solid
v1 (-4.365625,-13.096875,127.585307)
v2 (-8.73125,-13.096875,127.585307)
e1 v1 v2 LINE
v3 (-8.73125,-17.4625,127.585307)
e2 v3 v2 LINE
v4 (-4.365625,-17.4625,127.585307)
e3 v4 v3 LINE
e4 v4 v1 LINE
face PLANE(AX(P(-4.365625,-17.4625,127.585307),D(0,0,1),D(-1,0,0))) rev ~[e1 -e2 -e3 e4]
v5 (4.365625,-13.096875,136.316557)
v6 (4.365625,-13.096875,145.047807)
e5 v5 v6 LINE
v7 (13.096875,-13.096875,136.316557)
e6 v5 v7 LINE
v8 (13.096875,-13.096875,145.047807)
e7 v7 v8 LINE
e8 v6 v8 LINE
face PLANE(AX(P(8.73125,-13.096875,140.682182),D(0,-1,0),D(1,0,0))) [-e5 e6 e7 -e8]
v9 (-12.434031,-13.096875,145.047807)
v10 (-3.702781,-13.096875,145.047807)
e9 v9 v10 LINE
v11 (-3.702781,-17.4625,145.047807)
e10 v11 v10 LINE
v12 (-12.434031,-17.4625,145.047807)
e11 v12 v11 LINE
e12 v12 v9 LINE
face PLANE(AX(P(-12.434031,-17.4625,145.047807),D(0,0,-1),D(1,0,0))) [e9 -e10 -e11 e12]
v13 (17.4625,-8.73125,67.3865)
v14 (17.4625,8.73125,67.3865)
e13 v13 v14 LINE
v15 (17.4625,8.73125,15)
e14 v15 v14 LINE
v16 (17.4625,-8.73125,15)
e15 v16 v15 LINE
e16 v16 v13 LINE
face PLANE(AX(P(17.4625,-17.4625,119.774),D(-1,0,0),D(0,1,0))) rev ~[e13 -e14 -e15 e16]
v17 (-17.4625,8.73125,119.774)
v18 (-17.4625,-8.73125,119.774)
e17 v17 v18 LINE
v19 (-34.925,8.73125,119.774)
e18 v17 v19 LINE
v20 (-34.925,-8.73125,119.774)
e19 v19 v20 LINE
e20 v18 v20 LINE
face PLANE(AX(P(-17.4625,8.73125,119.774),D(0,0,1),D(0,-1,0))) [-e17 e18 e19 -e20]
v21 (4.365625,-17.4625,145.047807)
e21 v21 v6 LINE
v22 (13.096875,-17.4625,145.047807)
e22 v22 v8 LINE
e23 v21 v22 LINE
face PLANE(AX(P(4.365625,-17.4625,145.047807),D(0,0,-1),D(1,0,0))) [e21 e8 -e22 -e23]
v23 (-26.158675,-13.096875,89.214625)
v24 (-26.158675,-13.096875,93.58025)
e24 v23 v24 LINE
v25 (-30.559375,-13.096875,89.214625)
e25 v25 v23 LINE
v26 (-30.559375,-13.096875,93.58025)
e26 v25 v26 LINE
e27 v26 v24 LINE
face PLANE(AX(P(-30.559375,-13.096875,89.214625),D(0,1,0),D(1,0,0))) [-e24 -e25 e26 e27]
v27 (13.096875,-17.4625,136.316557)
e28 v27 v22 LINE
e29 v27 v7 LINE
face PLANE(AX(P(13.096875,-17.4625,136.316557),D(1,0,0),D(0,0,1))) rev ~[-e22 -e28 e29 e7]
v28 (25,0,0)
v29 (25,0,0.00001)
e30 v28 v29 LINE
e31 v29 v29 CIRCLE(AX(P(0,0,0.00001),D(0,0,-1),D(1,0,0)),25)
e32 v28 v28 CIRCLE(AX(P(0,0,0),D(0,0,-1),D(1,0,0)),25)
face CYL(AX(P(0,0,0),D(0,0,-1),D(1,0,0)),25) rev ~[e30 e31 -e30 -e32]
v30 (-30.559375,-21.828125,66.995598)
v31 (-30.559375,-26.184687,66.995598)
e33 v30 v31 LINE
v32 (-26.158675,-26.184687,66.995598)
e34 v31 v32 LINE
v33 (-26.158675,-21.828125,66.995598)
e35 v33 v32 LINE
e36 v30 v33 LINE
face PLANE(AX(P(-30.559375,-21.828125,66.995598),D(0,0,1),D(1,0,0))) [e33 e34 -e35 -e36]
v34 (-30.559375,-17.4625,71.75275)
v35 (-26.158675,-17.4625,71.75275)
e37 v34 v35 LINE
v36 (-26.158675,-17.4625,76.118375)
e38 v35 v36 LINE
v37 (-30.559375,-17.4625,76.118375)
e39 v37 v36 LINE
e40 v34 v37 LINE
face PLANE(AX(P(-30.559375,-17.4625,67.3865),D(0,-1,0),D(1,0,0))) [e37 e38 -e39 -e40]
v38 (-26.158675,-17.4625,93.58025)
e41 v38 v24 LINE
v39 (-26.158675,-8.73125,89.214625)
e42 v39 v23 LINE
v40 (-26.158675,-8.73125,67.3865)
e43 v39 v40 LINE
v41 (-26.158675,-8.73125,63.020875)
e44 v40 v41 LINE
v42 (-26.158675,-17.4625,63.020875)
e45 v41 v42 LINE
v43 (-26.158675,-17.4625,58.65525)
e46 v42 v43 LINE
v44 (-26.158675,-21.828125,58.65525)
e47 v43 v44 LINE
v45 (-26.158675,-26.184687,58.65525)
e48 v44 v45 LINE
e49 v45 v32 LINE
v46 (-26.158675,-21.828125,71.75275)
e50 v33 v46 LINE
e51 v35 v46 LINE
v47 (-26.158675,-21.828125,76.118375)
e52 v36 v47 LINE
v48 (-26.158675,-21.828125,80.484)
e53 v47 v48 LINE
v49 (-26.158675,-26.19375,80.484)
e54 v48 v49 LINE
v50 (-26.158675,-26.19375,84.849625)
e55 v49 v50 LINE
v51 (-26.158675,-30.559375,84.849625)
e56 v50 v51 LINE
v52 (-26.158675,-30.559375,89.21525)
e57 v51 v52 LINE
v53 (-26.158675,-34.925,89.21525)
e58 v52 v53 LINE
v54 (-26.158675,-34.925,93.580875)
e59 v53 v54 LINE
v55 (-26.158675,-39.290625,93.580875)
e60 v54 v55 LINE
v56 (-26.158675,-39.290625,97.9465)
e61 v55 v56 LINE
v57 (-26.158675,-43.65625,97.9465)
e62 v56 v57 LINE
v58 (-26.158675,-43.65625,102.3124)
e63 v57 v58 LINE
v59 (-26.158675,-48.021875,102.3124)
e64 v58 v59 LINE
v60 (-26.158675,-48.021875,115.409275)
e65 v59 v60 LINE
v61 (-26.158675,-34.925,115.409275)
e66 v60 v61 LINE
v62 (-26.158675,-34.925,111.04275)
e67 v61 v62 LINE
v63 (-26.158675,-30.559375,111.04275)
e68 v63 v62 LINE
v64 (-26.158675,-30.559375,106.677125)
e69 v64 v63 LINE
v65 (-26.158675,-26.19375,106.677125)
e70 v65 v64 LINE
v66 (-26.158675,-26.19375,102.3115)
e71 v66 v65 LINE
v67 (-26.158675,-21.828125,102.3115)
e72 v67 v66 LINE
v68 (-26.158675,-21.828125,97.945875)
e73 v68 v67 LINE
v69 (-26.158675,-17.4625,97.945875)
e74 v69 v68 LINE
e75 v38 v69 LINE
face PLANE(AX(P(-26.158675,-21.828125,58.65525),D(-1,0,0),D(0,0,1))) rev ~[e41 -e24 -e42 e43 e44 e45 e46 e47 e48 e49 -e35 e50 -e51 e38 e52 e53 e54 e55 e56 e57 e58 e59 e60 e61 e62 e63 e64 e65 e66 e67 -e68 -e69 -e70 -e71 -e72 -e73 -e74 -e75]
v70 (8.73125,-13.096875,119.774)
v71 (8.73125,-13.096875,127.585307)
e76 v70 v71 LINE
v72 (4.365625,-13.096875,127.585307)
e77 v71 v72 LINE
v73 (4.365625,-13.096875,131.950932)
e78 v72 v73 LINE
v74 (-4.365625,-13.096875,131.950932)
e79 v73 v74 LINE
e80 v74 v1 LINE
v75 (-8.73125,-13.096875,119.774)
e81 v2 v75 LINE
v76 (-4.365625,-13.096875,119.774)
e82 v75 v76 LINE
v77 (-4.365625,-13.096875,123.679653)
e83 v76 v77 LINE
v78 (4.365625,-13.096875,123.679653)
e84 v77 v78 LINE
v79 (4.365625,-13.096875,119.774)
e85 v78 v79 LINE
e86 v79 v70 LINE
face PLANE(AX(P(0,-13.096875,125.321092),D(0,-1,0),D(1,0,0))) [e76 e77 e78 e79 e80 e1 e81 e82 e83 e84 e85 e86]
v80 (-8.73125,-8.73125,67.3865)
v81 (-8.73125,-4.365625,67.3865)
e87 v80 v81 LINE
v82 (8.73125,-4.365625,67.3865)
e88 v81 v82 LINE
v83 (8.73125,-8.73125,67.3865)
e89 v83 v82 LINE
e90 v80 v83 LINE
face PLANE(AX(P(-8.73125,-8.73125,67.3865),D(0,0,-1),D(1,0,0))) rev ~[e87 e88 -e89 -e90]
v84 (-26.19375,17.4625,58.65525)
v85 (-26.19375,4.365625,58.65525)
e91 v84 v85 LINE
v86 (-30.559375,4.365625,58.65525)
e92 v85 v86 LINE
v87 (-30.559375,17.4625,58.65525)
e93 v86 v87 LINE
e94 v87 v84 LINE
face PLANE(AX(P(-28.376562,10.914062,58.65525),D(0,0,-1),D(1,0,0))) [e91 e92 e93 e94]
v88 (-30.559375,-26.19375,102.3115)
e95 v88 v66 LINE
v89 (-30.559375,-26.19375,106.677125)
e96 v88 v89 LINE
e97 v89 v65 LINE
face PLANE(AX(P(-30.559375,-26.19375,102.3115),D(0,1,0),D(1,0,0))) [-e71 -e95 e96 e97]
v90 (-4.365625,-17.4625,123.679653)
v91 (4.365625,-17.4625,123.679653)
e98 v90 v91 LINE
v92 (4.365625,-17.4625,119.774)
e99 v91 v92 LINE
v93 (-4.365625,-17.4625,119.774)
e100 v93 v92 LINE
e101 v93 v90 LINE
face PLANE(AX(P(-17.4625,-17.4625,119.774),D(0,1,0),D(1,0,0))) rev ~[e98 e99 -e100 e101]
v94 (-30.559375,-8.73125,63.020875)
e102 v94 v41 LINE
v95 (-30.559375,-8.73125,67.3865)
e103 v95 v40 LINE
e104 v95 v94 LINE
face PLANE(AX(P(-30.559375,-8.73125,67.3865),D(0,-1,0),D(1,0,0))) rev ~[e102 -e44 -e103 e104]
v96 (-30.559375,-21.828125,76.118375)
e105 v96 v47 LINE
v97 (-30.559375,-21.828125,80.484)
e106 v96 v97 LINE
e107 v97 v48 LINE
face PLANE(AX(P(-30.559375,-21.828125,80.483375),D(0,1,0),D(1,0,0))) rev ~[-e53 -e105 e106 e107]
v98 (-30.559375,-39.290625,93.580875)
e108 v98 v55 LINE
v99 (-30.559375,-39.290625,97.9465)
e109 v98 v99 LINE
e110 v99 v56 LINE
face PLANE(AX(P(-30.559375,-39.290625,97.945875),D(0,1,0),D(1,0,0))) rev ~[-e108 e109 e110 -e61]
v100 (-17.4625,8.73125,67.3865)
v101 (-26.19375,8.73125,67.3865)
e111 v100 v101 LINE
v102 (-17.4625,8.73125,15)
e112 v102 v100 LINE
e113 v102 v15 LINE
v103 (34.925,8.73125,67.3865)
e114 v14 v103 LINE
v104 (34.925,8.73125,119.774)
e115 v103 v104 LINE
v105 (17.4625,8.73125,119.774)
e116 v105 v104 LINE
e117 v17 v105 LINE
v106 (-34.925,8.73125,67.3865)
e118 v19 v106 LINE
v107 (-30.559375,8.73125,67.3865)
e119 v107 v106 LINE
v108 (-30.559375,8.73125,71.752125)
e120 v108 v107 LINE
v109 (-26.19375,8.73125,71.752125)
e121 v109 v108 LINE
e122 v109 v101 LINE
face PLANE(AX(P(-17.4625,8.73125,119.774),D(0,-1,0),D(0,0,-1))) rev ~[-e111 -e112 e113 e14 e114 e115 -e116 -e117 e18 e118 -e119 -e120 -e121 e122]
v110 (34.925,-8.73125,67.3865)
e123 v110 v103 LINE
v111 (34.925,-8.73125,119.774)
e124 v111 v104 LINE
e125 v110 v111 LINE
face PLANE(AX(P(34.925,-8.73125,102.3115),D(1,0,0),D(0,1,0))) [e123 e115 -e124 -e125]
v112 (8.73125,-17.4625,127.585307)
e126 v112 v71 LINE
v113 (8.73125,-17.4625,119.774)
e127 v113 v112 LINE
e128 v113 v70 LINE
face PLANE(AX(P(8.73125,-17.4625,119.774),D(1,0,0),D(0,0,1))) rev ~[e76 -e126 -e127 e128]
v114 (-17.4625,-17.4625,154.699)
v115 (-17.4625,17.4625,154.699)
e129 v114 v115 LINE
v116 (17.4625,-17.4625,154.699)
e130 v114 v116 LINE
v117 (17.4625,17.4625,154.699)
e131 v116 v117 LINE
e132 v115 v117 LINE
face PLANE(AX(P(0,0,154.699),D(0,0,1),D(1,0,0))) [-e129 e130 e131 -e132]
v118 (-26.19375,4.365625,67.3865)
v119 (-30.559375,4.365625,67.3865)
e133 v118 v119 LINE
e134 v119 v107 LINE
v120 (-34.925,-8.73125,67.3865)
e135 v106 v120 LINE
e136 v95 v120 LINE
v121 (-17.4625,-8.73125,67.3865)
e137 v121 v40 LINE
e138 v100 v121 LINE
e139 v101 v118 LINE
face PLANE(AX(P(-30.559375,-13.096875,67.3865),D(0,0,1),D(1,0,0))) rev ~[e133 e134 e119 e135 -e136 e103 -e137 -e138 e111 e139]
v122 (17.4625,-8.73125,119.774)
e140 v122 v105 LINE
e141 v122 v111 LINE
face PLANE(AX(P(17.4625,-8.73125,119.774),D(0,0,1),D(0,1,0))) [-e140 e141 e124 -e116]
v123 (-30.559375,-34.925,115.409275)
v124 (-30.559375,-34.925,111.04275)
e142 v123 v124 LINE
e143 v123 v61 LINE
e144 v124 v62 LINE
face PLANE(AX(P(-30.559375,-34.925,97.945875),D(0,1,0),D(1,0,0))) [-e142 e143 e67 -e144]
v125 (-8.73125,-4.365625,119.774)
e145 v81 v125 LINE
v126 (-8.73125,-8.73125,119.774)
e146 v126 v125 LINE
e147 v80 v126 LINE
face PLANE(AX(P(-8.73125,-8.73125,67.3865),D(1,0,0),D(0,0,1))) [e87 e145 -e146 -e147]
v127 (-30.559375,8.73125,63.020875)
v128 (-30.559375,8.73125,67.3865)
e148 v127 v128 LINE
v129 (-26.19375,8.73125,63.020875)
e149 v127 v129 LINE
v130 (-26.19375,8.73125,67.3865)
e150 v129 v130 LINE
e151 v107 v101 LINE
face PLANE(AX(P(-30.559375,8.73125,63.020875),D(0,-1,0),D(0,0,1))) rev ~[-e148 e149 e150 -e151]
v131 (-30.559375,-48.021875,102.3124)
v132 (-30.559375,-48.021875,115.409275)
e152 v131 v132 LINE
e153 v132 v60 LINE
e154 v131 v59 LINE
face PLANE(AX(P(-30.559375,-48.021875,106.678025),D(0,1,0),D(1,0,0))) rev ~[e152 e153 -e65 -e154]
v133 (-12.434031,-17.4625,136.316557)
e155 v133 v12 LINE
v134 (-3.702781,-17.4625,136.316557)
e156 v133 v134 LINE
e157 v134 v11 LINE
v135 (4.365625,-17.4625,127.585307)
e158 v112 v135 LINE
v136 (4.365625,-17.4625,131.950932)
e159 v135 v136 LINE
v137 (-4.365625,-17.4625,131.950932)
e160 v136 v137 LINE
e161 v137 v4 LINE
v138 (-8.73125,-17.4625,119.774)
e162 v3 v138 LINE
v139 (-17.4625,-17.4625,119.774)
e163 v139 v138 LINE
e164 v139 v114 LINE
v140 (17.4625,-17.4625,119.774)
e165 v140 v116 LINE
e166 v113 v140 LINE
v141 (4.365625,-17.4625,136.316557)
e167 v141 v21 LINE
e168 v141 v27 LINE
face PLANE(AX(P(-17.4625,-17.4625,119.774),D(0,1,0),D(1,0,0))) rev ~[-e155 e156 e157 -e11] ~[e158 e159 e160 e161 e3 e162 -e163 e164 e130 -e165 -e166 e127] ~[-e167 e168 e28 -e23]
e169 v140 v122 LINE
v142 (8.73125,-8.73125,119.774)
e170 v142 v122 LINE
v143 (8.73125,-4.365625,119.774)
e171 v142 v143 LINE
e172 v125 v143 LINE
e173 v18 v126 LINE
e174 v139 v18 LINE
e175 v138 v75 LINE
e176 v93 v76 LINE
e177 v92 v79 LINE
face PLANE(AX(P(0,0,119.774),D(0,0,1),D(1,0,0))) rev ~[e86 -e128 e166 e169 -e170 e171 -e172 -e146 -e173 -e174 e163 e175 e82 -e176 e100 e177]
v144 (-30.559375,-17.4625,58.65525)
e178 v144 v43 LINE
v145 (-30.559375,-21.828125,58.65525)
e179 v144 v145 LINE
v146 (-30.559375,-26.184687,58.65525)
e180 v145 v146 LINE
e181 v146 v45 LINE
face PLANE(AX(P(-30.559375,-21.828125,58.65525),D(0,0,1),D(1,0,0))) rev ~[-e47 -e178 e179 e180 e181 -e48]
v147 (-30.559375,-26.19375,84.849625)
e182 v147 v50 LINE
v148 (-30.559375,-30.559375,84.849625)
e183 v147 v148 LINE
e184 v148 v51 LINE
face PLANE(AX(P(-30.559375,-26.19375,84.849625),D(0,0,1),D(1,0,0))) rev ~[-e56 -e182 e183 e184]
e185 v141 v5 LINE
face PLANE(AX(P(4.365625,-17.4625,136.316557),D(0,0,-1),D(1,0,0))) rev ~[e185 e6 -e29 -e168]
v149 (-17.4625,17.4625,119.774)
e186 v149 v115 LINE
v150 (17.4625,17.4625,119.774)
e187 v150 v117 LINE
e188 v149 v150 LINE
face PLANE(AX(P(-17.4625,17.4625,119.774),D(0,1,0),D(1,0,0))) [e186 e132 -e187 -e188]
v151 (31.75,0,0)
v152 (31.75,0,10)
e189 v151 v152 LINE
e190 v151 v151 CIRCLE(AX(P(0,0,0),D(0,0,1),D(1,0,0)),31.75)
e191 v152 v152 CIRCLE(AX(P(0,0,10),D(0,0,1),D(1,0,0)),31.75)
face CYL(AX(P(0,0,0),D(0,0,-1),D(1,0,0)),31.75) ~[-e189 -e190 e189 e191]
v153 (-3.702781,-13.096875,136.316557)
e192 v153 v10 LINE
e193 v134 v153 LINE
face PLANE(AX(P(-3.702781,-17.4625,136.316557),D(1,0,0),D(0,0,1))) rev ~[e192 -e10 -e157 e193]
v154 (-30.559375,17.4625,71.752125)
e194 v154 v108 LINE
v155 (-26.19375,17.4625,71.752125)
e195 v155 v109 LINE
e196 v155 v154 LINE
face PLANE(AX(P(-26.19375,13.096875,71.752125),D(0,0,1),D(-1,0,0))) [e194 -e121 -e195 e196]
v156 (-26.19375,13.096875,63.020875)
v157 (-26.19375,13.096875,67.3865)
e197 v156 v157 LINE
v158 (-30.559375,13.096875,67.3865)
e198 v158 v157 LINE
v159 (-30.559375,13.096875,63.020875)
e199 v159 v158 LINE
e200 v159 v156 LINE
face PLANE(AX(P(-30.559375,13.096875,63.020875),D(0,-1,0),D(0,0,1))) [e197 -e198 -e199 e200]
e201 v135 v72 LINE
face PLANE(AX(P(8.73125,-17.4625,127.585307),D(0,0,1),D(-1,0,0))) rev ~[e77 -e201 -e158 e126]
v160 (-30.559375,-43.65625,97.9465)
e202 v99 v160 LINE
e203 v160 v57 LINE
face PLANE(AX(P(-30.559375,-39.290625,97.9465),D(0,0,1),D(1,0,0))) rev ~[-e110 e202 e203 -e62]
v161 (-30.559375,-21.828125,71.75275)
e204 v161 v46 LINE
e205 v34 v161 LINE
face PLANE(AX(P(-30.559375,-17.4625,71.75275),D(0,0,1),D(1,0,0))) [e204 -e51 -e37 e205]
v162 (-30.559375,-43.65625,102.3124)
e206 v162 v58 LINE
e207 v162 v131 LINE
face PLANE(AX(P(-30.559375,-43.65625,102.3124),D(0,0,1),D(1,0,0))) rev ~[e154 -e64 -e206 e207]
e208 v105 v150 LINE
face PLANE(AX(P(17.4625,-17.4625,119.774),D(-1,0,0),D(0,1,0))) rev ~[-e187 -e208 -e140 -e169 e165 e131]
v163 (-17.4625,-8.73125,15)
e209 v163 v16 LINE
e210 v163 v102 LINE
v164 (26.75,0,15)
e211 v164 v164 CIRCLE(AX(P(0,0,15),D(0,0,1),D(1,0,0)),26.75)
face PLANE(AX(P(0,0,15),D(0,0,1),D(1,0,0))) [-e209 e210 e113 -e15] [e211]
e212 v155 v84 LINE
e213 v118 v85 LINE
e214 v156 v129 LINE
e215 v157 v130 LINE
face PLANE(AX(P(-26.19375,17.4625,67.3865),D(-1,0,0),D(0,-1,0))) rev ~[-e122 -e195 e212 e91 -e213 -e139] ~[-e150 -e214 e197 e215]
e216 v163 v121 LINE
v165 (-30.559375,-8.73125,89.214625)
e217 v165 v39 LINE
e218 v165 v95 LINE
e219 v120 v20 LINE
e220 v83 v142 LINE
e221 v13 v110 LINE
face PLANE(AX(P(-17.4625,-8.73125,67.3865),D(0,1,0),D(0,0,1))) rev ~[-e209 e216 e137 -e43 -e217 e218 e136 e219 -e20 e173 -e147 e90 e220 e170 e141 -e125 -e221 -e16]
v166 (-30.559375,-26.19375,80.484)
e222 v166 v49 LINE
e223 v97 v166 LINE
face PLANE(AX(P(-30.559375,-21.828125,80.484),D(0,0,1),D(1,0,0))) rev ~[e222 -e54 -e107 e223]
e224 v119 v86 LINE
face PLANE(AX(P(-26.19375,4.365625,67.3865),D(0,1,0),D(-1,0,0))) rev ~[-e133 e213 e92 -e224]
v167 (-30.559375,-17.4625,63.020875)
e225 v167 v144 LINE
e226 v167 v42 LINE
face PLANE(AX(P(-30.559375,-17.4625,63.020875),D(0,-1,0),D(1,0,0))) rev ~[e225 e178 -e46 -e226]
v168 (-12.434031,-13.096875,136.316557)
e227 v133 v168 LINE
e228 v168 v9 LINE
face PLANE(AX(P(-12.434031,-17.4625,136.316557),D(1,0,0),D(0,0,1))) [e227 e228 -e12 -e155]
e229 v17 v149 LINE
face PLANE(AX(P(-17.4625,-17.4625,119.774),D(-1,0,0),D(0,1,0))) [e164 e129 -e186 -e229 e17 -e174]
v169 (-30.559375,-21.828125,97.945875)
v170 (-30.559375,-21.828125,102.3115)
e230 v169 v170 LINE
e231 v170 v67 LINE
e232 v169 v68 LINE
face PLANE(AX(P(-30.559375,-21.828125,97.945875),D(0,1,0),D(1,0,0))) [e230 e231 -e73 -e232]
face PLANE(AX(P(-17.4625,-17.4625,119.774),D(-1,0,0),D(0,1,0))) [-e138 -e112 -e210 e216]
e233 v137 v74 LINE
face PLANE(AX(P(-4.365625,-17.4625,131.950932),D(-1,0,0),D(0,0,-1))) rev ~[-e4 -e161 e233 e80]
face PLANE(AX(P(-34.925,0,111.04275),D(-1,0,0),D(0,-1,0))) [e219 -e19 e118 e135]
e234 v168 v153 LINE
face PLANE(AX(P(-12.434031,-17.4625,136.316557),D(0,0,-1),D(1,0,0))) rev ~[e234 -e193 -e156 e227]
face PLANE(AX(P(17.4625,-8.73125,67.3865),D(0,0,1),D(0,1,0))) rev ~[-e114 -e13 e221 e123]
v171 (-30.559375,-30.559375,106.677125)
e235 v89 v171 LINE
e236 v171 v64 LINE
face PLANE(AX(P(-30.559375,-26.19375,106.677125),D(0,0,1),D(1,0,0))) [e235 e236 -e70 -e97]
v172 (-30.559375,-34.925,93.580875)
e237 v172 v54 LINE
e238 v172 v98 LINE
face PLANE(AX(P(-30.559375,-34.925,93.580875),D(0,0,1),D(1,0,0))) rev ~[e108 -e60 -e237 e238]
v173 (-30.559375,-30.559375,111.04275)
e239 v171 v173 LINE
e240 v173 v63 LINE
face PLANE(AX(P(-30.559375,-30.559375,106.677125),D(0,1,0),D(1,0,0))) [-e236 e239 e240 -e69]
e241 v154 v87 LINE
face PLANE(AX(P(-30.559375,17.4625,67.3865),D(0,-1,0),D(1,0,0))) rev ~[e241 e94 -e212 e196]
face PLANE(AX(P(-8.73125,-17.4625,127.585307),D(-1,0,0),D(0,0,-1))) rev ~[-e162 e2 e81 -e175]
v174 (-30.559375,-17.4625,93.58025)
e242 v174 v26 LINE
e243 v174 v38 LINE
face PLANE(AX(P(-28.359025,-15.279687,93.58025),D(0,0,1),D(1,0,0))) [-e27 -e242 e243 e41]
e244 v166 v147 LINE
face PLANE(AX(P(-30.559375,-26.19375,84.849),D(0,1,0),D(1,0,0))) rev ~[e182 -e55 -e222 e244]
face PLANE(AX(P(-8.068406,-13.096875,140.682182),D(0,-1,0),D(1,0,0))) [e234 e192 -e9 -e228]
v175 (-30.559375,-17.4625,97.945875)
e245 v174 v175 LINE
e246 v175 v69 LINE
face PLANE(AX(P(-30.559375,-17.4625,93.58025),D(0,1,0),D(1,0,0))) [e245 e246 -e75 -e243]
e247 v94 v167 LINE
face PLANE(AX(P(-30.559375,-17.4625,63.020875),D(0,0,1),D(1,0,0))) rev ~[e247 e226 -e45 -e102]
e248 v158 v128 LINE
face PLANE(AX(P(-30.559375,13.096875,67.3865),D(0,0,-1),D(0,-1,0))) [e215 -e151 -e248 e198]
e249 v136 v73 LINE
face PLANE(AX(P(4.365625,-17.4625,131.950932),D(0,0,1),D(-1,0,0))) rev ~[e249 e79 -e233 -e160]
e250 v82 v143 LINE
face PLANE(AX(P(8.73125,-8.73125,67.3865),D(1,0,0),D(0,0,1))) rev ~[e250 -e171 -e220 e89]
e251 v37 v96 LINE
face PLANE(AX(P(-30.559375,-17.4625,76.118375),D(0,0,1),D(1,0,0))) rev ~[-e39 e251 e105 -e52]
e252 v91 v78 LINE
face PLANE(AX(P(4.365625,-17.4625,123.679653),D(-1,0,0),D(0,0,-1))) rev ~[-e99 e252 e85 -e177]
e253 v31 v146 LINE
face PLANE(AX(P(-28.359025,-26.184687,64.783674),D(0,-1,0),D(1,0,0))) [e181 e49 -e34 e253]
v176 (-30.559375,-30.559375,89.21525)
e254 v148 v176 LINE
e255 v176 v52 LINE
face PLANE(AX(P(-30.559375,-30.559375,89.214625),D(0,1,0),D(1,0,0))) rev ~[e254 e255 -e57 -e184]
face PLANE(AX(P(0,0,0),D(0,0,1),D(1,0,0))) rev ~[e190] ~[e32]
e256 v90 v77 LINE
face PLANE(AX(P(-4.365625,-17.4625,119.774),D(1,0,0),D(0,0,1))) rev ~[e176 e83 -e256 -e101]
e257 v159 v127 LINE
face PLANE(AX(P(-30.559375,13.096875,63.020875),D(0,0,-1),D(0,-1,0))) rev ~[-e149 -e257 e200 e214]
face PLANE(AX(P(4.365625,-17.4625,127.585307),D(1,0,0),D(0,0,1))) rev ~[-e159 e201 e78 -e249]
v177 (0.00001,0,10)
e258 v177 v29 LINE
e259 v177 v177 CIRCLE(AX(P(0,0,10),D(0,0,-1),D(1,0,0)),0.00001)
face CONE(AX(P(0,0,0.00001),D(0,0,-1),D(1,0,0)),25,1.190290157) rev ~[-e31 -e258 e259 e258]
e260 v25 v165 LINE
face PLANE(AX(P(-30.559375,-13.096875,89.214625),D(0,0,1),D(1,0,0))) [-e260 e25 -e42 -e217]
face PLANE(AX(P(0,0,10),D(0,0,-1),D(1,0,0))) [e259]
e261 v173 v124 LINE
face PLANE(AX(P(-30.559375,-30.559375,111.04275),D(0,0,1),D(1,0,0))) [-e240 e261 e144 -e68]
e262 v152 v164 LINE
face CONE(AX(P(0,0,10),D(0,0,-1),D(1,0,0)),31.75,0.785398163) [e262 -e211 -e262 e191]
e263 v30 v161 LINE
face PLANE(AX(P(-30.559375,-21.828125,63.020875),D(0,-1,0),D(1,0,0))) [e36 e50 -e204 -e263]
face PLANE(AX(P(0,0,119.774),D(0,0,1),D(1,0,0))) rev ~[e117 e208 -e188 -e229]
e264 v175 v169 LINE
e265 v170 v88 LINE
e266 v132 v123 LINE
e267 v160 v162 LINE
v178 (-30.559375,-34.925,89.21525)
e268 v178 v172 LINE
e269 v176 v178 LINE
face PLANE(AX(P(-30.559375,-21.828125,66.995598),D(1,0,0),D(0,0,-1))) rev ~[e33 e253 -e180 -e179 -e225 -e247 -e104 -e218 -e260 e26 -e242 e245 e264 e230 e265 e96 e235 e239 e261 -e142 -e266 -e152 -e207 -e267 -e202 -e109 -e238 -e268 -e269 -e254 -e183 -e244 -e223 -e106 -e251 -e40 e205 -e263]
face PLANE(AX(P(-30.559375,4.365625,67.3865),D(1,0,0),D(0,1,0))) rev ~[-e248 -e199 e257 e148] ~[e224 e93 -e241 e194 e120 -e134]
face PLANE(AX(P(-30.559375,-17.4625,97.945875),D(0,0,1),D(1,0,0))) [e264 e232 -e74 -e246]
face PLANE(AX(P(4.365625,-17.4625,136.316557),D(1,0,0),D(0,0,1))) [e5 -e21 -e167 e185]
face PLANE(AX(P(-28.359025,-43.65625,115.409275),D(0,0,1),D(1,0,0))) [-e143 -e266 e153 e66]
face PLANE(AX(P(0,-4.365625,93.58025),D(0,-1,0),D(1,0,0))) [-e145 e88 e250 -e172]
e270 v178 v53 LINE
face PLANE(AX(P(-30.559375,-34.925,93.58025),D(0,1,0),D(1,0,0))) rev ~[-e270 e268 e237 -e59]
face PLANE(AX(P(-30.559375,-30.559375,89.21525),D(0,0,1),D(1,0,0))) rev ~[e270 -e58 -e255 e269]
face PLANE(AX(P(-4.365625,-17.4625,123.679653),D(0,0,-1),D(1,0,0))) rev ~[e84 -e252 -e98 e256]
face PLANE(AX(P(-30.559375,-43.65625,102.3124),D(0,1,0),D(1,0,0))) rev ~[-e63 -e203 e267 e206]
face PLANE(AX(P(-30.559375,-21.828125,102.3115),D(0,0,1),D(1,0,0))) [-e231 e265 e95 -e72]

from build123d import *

# Parameters (mm, degrees)
F0_R      = 31.75
F1_DEPTH  = 15
F2_SIZE   = 5
F3_R      = 25
F4_DEPTH  = 10
F5_SIZE2  = 9.99999
F5_SIZE   = 24.99999
F6_W      = 34.925
F6_H      = 17.4625
F7_DEPTH  = 104.774
F10_W     = 34.925
F10_H     = 34.925
F11_DEPTH = 34.925
F12_W     = 17.4625
F12_H     = 17.4625
F13_DEPTH = 17.4625
F14_DEPTH = 34.925
F15_W     = 17.4625
F15_H     = 17.4625
F15_H_2   = 34.925
F16_DEPTH = 17.4625
F19_W     = 8.73125
F19_H     = 8.73125
F20_DEPTH = 4.365625
F17_W     = 4.365625
F17_H     = 4.365625
F23_DEPTH = 4.365625
F24_DEPTH = 4.365625
F25_W     = 4.4006995887
F25_H     = 4.365625
F26_DEPTH = 4.365625
F27_DEPTH = 8.73125
F28_W     = 4.4006995887
F28_H     = 4.365625
F29_DEPTH = 4.365625
F30_W     = 4.4006995887
F30_H     = 4.365625
F31_DEPTH = 4.365625
F32_W     = 4.4006995887
F32_H     = 4.365
F33_DEPTH = 4.365625
F34_DEPTH = 8.73125
F35_W     = 4.4006995887
F35_H     = 4.365
F36_DEPTH = 4.365625
F37_DEPTH = 8.73125
F38_W     = 4.4006995887
F38_H     = 4.365
F39_DEPTH = 4.365625
F40_DEPTH = 8.73125
F42_W     = 4.365625
F42_H     = 4.365625
F43_DEPTH = 4.365625
F44_DEPTH = 4.365625
F46_DEPTH = 8.73125
F47_W     = 4.365625
F47_H     = 4.365625
F48_DEPTH = 25
F41_W     = 4.4006995887
F41_H     = 4.365
F49_DEPTH = 4.365625
F50_DEPTH = 8.73125
F51_W     = 4.4006995887
F51_H     = 4.365
F52_DEPTH = 4.365625
F53_DEPTH = 8.73215
F54_W     = 4.4006995887
F54_H     = 4.3659
F55_DEPTH = 4.365625
F56_DEPTH = 4.365625
F57_W     = 4.4006995887
F57_H     = 4.365625
F58_DEPTH = 4.365625
F59_W     = 4.4006995887
F59_H     = 8.73125
F60_DEPTH = 4.365625
F61_DEPTH = 4.365625
F62_DEPTH = 4.365625
F63_DEPTH = 4.365625
F64_W     = 4.4006995887
F64_H     = 8.73125
F65_DEPTH = 4.365625
F66_W     = 4.4006995887
F66_H     = 4.36625
F66_H_2   = 4.365625
F67_DEPTH = 4.365625
F68_W     = 4.4006995887
F68_H     = 4.365625
F69_DEPTH = 4.365625
F70_W     = 4.4006995887
F70_H     = 4.4238492846
F70_H_2   = 3.9164990911
F71_DEPTH = 4.3565625
F21_W     = 17.4625
F21_H     = 52.3875
F72_DEPTH = 4.365625


# Not quite as in the source:
# - a fillet or chamfer is up to 0.001 mm smaller than in the source, because OpenCascade refuses the exact size


with BuildPart() as f1:
    # F0 (on Top) → F1 (new body)
    with BuildSketch(Plane.XY):
        Circle(F0_R)
    extrude(amount=F1_DEPTH)

    # F2
    f2_edges = [f1.edges().sort_by_distance(p)[0] for p in [
        (-31.75, 0, 15),
    ]]
    chamfer(f2_edges, length=F2_SIZE)

    # F3 (on face) → F4 (cut)
    with BuildSketch(Plane(origin=(0, 0, 0), x_dir=(1, 0, 0), z_dir=(0, 0, -1))):
        Circle(F3_R)
    extrude(amount=-F4_DEPTH, mode=Mode.SUBTRACT)

    # F5 (size 25 and 10 in the source; OpenCascade refuses exactly that, so slightly less here)
    f5_edges = [f1.edges().sort_by_distance(p)[0] for p in [
        (-25, 0, 10),
    ]]
    f5_side = f1.faces().sort_by_distance((0, 0, 10))[0]
    chamfer(f5_edges, length=F5_SIZE, length2=F5_SIZE2, reference=f5_side)

    # F6 (on face) → F7 (join)
    with BuildSketch(Plane.XY.offset(15)):
        Rectangle(F6_W, F6_H)
    extrude(amount=F7_DEPTH)

    # F10 (on face) → F11 (join)
    with BuildSketch(Plane.XY.offset(119.774)):
        Rectangle(F10_W, F10_H)
    extrude(amount=F11_DEPTH)

    # F12 (on face) → F13 (join)
    with BuildSketch(Plane.YZ.offset(17.4625)):
        with Locations((0, 111.04275)):
            Rectangle(F12_W, F12_H)
    extrude(amount=F13_DEPTH)

    # F14 (add): a face of the model
    f14_faces = [f1.faces().sort_by_distance(p)[0] for p in [
        (26.19375, 0, 102.3115),
    ]]
    extrude(f14_faces, amount=F14_DEPTH)

    # F15 (on face) → F16 (join)
    with BuildSketch(Plane(origin=(-17.4625, 0, 0), x_dir=(0, -1, 0), z_dir=(-1, 0, 0))):
        with Locations((0, 111.04275)):
            Rectangle(F15_W, F15_H)
        with Locations((0, 84.849)):
            Rectangle(F15_W, F15_H_2)
    extrude(amount=F16_DEPTH)

    # F19 (on face) → F20 (cut)
    with BuildSketch(Plane.XZ.offset(17.4625)):
        Polygon((-8.73125, 127.5853067636), (-8.73125, 119.774), (-4.365625, 119.774), (-4.365625, 123.6796533818), (4.365625, 123.6796533818), (4.365625, 119.774), (8.73125, 119.774), (8.73125, 127.5853067636), (4.365625, 127.5853067636), (4.365625, 131.9509317636), (-4.365625, 131.9509317636), (-4.365625, 127.5853067636), align=None)
        with Locations((-8.068405883, 140.6821817636)):
            Rectangle(F19_W, F19_H)
        with Locations((8.73125, 140.6821817636)):
            Rectangle(F19_W, F19_H)
    extrude(amount=-F20_DEPTH, mode=Mode.SUBTRACT)

    # F17 (on face) → F23 (join)
    with BuildSketch(Plane(origin=(0, 8.73125, 0), x_dir=(-1, 0, 0), z_dir=(0, 1, 0))):
        with Locations((28.3765625, 69.5693125)):
            Rectangle(F17_W, F17_H)
    extrude(amount=F23_DEPTH)

    # F24 (add): a face of the model
    f24_faces = [f1.faces().sort_by_distance(p)[0] for p in [
        (-28.3765625, 10.9140625, 71.752125),
    ]]
    extrude(f24_faces, amount=F24_DEPTH)

    # F25 (on face) → F26 (join)
    with BuildSketch(Plane.XZ.offset(8.73125)):
        with Locations((-28.3590252057, 69.5693125)):
            Rectangle(F25_W, F25_H)
    extrude(amount=F26_DEPTH)

    # F27 (add): a face of the model
    f27_faces = [f1.faces().sort_by_distance(p)[0] for p in [
        (-28.3590252057, -10.9140625, 71.752125),
    ]]
    extrude(f27_faces, amount=F27_DEPTH)

    # F28 (on face) → F29 (join)
    with BuildSketch(Plane.XZ.offset(13.096875)):
        with Locations((-28.3590252057, 73.9349375)):
            Rectangle(F28_W, F28_H)
        with Locations((-28.3590252057, 78.3005625)):
            Rectangle(F28_W, F28_H)
    extrude(amount=F29_DEPTH)

    # F30 (on face) → F31 (join)
    with BuildSketch(Plane.XY.offset(80.483375)):
        with Locations((-28.3590252057, -15.2796875)):
            Rectangle(F30_W, F30_H)
    extrude(amount=F31_DEPTH)

    # F32 (on face) → F33 (join)
    with BuildSketch(Plane.XZ.offset(17.4625)):
        with Locations((-28.3590252057, 78.300875)):
            Rectangle(F32_W, F32_H)
    extrude(amount=F33_DEPTH)

    # F34 (add): a face of the model
    f34_faces = [f1.faces().sort_by_distance(p)[0] for p in [
        (-28.3590252057, -19.6453125, 80.483375),
    ]]
    extrude(f34_faces, amount=F34_DEPTH)

    # F35 (on face) → F36 (join)
    with BuildSketch(Plane.XZ.offset(21.828125)):
        with Locations((-28.3590252057, 82.6665)):
            Rectangle(F35_W, F35_H)
    extrude(amount=F36_DEPTH)

    # F37 (add): a face of the model
    f37_faces = [f1.faces().sort_by_distance(p)[0] for p in [
        (-28.3590252057, -24.0109375, 84.849),
    ]]
    extrude(f37_faces, amount=F37_DEPTH)

    # F38 (on face) → F39 (join)
    with BuildSketch(Plane.XZ.offset(26.19375)):
        with Locations((-28.3590252057, 87.032125)):
            Rectangle(F38_W, F38_H)
    extrude(amount=F39_DEPTH)

    # F40 (add): a face of the model
    f40_faces = [f1.faces().sort_by_distance(p)[0] for p in [
        (-28.3590252057, -28.3765625, 89.214625),
    ]]
    extrude(f40_faces, amount=F40_DEPTH)

    # F42 (on face) → F43 (cut)
    with BuildSketch(Plane(origin=(0, 13.096875, 0), x_dir=(-1, 0, 0), z_dir=(0, 1, 0))):
        with Locations((28.3765625, 73.9349375)):
            Rectangle(F42_W, F42_H)
    extrude(amount=-F43_DEPTH, mode=Mode.SUBTRACT)

    # F44 (add): a face of the model
    f44_faces = [f1.faces().sort_by_distance(p)[0] for p in [
        (-28.3765625, 13.096875, 69.5693125),
    ]]
    extrude(f44_faces, amount=F44_DEPTH)

    # F45 (on face) → F46 (join)
    with BuildSketch(Plane(origin=(0, 0, 67.3865), x_dir=(1, 0, 0), z_dir=(0, 0, -1))):
        Polygon((-30.559375, -4.365625), (-30.559375, -8.73125), (-30.559375, -17.4625), (-26.19375, -17.4625), (-26.19375, -8.73125), (-26.19375, -4.365625), align=None)
    extrude(amount=F46_DEPTH)

    # F47 (on face) → F48 (cut)
    with BuildSketch(Plane(origin=(-30.559375, 0, 0), x_dir=(0, -1, 0), z_dir=(-1, 0, 0))):
        with Locations((-10.9140625, 65.2036875)):
            Rectangle(F47_W, F47_H)
    extrude(amount=-F48_DEPTH, mode=Mode.SUBTRACT)

    # F41 (on face) → F49 (join)
    with BuildSketch(Plane.XZ.offset(30.559375)):
        with Locations((-28.3590252057, 91.39775)):
            Rectangle(F41_W, F41_H)
    extrude(amount=F49_DEPTH)

    # F50 (add): a face of the model
    f50_faces = [f1.faces().sort_by_distance(p)[0] for p in [
        (-28.3590252057, -32.7421875, 93.58025),
    ]]
    extrude(f50_faces, amount=F50_DEPTH)

    # F51 (on face) → F52 (join)
    with BuildSketch(Plane.XZ.offset(34.925)):
        with Locations((-28.3590252057, 95.763375)):
            Rectangle(F51_W, F51_H)
    extrude(amount=F52_DEPTH)

    # F53 (add): a face of the model
    f53_faces = [f1.faces().sort_by_distance(p)[0] for p in [
        (-28.3590252057, -37.1078125, 97.945875),
    ]]
    extrude(f53_faces, amount=F53_DEPTH)

    # F54 (on face) → F55 (join)
    with BuildSketch(Plane.XZ.offset(39.290625)):
        with Locations((-28.3590252057, 100.12945)):
            Rectangle(F54_W, F54_H)
    extrude(amount=F55_DEPTH)

    # F56 (add): a face of the model
    f56_faces = [f1.faces().sort_by_distance(p)[0] for p in [
        (-28.3590252057, -41.4734375, 102.3124),
    ]]
    extrude(f56_faces, amount=F56_DEPTH)

    # F57 (on face) → F58 (join)
    with BuildSketch(Plane.XZ.offset(43.65625)):
        with Locations((-28.3590252057, 104.4952125)):
            Rectangle(F57_W, F57_H)
    extrude(amount=F58_DEPTH)

    # F59 (on face) → F60 (join)
    with BuildSketch(Plane.XY.offset(106.678025)):
        with Locations((-28.3590252057, -43.65625)):
            Rectangle(F59_W, F59_H)
    extrude(amount=F60_DEPTH)

    # F61 (add): faces of the model
    f61_faces = [f1.faces().sort_by_distance(p)[0] for p in [
        (-28.3590252057, -10.9140625, 80.483375),
        (-28.3590252057, -15.2796875, 84.849),
        (-28.3590252057, -19.6453125, 89.214625),
        (-28.3590252057, -24.0109375, 93.58025),
        (-28.3590252057, -28.3765625, 97.945875),
        (-28.3590252057, -32.7421875, 102.3115),
        (-28.3590252057, -37.1078125, 106.678025),
        (-28.3590252057, -43.65625, 111.04365),
    ]]
    extrude(f61_faces, amount=F61_DEPTH)

    # F62 (add): faces of the model
    f62_faces = [f1.faces().sort_by_distance(p)[0] for p in [
        (-28.3590252057, -10.9140625, 84.849),
        (-28.3590252057, -15.2796875, 89.214625),
        (-28.3590252057, -19.6453125, 93.58025),
        (-28.3590252057, -24.0109375, 97.945875),
        (-28.3590252057, -28.3765625, 102.3115),
        (-28.3590252057, -32.7421875, 106.677125),
        (-28.3590252057, -37.1078125, 111.04365),
    ]]
    extrude(f62_faces, amount=F62_DEPTH)

    # F63 (add): a face of the model
    f63_faces = [f1.faces().sort_by_distance(p)[0] for p in [
        (-28.3590252057, -15.2796875, 71.752125),
    ]]
    extrude(f63_faces, amount=F63_DEPTH)

    # F64 (on face) → F65 (join)
    with BuildSketch(Plane(origin=(0, 0, 67.3865), x_dir=(1, 0, 0), z_dir=(0, 0, -1))):
        with Locations((-28.3590252057, 13.096875)):
            Rectangle(F64_W, F64_H)
    extrude(amount=F65_DEPTH)

    # F66 (on face) → F67 (join)
    with BuildSketch(Plane.XZ.offset(17.4625)):
        with Locations((-28.3590252057, 69.569625)):
            Rectangle(F66_W, F66_H)
        with Locations((-28.3590252057, 65.2036875)):
            Rectangle(F66_W, F66_H_2)
    extrude(amount=F67_DEPTH)

    # F68 (on face) → F69 (join)
    with BuildSketch(Plane(origin=(0, 0, 63.020875), x_dir=(1, 0, 0), z_dir=(0, 0, -1))):
        with Locations((-28.3590252057, 19.6453125)):
            Rectangle(F68_W, F68_H)
    extrude(amount=F69_DEPTH)

    # F70 (on face) → F71 (join)
    with BuildSketch(Plane.XZ.offset(21.828125)):
        with Locations((-28.3590252057, 64.7836737335)):
            Rectangle(F70_W, F70_H)
        with Locations((-28.3590252057, 60.6134995456)):
            Rectangle(F70_W, F70_H_2)
    extrude(amount=F71_DEPTH)

    # F21 (on face) → F72 (cut)
    with BuildSketch(Plane.XZ.offset(8.73125)):
        with Locations((0, 93.58025)):
            Rectangle(F21_W, F21_H)
    extrude(amount=-F72_DEPTH, mode=Mode.SUBTRACT)


solid = f1.part
